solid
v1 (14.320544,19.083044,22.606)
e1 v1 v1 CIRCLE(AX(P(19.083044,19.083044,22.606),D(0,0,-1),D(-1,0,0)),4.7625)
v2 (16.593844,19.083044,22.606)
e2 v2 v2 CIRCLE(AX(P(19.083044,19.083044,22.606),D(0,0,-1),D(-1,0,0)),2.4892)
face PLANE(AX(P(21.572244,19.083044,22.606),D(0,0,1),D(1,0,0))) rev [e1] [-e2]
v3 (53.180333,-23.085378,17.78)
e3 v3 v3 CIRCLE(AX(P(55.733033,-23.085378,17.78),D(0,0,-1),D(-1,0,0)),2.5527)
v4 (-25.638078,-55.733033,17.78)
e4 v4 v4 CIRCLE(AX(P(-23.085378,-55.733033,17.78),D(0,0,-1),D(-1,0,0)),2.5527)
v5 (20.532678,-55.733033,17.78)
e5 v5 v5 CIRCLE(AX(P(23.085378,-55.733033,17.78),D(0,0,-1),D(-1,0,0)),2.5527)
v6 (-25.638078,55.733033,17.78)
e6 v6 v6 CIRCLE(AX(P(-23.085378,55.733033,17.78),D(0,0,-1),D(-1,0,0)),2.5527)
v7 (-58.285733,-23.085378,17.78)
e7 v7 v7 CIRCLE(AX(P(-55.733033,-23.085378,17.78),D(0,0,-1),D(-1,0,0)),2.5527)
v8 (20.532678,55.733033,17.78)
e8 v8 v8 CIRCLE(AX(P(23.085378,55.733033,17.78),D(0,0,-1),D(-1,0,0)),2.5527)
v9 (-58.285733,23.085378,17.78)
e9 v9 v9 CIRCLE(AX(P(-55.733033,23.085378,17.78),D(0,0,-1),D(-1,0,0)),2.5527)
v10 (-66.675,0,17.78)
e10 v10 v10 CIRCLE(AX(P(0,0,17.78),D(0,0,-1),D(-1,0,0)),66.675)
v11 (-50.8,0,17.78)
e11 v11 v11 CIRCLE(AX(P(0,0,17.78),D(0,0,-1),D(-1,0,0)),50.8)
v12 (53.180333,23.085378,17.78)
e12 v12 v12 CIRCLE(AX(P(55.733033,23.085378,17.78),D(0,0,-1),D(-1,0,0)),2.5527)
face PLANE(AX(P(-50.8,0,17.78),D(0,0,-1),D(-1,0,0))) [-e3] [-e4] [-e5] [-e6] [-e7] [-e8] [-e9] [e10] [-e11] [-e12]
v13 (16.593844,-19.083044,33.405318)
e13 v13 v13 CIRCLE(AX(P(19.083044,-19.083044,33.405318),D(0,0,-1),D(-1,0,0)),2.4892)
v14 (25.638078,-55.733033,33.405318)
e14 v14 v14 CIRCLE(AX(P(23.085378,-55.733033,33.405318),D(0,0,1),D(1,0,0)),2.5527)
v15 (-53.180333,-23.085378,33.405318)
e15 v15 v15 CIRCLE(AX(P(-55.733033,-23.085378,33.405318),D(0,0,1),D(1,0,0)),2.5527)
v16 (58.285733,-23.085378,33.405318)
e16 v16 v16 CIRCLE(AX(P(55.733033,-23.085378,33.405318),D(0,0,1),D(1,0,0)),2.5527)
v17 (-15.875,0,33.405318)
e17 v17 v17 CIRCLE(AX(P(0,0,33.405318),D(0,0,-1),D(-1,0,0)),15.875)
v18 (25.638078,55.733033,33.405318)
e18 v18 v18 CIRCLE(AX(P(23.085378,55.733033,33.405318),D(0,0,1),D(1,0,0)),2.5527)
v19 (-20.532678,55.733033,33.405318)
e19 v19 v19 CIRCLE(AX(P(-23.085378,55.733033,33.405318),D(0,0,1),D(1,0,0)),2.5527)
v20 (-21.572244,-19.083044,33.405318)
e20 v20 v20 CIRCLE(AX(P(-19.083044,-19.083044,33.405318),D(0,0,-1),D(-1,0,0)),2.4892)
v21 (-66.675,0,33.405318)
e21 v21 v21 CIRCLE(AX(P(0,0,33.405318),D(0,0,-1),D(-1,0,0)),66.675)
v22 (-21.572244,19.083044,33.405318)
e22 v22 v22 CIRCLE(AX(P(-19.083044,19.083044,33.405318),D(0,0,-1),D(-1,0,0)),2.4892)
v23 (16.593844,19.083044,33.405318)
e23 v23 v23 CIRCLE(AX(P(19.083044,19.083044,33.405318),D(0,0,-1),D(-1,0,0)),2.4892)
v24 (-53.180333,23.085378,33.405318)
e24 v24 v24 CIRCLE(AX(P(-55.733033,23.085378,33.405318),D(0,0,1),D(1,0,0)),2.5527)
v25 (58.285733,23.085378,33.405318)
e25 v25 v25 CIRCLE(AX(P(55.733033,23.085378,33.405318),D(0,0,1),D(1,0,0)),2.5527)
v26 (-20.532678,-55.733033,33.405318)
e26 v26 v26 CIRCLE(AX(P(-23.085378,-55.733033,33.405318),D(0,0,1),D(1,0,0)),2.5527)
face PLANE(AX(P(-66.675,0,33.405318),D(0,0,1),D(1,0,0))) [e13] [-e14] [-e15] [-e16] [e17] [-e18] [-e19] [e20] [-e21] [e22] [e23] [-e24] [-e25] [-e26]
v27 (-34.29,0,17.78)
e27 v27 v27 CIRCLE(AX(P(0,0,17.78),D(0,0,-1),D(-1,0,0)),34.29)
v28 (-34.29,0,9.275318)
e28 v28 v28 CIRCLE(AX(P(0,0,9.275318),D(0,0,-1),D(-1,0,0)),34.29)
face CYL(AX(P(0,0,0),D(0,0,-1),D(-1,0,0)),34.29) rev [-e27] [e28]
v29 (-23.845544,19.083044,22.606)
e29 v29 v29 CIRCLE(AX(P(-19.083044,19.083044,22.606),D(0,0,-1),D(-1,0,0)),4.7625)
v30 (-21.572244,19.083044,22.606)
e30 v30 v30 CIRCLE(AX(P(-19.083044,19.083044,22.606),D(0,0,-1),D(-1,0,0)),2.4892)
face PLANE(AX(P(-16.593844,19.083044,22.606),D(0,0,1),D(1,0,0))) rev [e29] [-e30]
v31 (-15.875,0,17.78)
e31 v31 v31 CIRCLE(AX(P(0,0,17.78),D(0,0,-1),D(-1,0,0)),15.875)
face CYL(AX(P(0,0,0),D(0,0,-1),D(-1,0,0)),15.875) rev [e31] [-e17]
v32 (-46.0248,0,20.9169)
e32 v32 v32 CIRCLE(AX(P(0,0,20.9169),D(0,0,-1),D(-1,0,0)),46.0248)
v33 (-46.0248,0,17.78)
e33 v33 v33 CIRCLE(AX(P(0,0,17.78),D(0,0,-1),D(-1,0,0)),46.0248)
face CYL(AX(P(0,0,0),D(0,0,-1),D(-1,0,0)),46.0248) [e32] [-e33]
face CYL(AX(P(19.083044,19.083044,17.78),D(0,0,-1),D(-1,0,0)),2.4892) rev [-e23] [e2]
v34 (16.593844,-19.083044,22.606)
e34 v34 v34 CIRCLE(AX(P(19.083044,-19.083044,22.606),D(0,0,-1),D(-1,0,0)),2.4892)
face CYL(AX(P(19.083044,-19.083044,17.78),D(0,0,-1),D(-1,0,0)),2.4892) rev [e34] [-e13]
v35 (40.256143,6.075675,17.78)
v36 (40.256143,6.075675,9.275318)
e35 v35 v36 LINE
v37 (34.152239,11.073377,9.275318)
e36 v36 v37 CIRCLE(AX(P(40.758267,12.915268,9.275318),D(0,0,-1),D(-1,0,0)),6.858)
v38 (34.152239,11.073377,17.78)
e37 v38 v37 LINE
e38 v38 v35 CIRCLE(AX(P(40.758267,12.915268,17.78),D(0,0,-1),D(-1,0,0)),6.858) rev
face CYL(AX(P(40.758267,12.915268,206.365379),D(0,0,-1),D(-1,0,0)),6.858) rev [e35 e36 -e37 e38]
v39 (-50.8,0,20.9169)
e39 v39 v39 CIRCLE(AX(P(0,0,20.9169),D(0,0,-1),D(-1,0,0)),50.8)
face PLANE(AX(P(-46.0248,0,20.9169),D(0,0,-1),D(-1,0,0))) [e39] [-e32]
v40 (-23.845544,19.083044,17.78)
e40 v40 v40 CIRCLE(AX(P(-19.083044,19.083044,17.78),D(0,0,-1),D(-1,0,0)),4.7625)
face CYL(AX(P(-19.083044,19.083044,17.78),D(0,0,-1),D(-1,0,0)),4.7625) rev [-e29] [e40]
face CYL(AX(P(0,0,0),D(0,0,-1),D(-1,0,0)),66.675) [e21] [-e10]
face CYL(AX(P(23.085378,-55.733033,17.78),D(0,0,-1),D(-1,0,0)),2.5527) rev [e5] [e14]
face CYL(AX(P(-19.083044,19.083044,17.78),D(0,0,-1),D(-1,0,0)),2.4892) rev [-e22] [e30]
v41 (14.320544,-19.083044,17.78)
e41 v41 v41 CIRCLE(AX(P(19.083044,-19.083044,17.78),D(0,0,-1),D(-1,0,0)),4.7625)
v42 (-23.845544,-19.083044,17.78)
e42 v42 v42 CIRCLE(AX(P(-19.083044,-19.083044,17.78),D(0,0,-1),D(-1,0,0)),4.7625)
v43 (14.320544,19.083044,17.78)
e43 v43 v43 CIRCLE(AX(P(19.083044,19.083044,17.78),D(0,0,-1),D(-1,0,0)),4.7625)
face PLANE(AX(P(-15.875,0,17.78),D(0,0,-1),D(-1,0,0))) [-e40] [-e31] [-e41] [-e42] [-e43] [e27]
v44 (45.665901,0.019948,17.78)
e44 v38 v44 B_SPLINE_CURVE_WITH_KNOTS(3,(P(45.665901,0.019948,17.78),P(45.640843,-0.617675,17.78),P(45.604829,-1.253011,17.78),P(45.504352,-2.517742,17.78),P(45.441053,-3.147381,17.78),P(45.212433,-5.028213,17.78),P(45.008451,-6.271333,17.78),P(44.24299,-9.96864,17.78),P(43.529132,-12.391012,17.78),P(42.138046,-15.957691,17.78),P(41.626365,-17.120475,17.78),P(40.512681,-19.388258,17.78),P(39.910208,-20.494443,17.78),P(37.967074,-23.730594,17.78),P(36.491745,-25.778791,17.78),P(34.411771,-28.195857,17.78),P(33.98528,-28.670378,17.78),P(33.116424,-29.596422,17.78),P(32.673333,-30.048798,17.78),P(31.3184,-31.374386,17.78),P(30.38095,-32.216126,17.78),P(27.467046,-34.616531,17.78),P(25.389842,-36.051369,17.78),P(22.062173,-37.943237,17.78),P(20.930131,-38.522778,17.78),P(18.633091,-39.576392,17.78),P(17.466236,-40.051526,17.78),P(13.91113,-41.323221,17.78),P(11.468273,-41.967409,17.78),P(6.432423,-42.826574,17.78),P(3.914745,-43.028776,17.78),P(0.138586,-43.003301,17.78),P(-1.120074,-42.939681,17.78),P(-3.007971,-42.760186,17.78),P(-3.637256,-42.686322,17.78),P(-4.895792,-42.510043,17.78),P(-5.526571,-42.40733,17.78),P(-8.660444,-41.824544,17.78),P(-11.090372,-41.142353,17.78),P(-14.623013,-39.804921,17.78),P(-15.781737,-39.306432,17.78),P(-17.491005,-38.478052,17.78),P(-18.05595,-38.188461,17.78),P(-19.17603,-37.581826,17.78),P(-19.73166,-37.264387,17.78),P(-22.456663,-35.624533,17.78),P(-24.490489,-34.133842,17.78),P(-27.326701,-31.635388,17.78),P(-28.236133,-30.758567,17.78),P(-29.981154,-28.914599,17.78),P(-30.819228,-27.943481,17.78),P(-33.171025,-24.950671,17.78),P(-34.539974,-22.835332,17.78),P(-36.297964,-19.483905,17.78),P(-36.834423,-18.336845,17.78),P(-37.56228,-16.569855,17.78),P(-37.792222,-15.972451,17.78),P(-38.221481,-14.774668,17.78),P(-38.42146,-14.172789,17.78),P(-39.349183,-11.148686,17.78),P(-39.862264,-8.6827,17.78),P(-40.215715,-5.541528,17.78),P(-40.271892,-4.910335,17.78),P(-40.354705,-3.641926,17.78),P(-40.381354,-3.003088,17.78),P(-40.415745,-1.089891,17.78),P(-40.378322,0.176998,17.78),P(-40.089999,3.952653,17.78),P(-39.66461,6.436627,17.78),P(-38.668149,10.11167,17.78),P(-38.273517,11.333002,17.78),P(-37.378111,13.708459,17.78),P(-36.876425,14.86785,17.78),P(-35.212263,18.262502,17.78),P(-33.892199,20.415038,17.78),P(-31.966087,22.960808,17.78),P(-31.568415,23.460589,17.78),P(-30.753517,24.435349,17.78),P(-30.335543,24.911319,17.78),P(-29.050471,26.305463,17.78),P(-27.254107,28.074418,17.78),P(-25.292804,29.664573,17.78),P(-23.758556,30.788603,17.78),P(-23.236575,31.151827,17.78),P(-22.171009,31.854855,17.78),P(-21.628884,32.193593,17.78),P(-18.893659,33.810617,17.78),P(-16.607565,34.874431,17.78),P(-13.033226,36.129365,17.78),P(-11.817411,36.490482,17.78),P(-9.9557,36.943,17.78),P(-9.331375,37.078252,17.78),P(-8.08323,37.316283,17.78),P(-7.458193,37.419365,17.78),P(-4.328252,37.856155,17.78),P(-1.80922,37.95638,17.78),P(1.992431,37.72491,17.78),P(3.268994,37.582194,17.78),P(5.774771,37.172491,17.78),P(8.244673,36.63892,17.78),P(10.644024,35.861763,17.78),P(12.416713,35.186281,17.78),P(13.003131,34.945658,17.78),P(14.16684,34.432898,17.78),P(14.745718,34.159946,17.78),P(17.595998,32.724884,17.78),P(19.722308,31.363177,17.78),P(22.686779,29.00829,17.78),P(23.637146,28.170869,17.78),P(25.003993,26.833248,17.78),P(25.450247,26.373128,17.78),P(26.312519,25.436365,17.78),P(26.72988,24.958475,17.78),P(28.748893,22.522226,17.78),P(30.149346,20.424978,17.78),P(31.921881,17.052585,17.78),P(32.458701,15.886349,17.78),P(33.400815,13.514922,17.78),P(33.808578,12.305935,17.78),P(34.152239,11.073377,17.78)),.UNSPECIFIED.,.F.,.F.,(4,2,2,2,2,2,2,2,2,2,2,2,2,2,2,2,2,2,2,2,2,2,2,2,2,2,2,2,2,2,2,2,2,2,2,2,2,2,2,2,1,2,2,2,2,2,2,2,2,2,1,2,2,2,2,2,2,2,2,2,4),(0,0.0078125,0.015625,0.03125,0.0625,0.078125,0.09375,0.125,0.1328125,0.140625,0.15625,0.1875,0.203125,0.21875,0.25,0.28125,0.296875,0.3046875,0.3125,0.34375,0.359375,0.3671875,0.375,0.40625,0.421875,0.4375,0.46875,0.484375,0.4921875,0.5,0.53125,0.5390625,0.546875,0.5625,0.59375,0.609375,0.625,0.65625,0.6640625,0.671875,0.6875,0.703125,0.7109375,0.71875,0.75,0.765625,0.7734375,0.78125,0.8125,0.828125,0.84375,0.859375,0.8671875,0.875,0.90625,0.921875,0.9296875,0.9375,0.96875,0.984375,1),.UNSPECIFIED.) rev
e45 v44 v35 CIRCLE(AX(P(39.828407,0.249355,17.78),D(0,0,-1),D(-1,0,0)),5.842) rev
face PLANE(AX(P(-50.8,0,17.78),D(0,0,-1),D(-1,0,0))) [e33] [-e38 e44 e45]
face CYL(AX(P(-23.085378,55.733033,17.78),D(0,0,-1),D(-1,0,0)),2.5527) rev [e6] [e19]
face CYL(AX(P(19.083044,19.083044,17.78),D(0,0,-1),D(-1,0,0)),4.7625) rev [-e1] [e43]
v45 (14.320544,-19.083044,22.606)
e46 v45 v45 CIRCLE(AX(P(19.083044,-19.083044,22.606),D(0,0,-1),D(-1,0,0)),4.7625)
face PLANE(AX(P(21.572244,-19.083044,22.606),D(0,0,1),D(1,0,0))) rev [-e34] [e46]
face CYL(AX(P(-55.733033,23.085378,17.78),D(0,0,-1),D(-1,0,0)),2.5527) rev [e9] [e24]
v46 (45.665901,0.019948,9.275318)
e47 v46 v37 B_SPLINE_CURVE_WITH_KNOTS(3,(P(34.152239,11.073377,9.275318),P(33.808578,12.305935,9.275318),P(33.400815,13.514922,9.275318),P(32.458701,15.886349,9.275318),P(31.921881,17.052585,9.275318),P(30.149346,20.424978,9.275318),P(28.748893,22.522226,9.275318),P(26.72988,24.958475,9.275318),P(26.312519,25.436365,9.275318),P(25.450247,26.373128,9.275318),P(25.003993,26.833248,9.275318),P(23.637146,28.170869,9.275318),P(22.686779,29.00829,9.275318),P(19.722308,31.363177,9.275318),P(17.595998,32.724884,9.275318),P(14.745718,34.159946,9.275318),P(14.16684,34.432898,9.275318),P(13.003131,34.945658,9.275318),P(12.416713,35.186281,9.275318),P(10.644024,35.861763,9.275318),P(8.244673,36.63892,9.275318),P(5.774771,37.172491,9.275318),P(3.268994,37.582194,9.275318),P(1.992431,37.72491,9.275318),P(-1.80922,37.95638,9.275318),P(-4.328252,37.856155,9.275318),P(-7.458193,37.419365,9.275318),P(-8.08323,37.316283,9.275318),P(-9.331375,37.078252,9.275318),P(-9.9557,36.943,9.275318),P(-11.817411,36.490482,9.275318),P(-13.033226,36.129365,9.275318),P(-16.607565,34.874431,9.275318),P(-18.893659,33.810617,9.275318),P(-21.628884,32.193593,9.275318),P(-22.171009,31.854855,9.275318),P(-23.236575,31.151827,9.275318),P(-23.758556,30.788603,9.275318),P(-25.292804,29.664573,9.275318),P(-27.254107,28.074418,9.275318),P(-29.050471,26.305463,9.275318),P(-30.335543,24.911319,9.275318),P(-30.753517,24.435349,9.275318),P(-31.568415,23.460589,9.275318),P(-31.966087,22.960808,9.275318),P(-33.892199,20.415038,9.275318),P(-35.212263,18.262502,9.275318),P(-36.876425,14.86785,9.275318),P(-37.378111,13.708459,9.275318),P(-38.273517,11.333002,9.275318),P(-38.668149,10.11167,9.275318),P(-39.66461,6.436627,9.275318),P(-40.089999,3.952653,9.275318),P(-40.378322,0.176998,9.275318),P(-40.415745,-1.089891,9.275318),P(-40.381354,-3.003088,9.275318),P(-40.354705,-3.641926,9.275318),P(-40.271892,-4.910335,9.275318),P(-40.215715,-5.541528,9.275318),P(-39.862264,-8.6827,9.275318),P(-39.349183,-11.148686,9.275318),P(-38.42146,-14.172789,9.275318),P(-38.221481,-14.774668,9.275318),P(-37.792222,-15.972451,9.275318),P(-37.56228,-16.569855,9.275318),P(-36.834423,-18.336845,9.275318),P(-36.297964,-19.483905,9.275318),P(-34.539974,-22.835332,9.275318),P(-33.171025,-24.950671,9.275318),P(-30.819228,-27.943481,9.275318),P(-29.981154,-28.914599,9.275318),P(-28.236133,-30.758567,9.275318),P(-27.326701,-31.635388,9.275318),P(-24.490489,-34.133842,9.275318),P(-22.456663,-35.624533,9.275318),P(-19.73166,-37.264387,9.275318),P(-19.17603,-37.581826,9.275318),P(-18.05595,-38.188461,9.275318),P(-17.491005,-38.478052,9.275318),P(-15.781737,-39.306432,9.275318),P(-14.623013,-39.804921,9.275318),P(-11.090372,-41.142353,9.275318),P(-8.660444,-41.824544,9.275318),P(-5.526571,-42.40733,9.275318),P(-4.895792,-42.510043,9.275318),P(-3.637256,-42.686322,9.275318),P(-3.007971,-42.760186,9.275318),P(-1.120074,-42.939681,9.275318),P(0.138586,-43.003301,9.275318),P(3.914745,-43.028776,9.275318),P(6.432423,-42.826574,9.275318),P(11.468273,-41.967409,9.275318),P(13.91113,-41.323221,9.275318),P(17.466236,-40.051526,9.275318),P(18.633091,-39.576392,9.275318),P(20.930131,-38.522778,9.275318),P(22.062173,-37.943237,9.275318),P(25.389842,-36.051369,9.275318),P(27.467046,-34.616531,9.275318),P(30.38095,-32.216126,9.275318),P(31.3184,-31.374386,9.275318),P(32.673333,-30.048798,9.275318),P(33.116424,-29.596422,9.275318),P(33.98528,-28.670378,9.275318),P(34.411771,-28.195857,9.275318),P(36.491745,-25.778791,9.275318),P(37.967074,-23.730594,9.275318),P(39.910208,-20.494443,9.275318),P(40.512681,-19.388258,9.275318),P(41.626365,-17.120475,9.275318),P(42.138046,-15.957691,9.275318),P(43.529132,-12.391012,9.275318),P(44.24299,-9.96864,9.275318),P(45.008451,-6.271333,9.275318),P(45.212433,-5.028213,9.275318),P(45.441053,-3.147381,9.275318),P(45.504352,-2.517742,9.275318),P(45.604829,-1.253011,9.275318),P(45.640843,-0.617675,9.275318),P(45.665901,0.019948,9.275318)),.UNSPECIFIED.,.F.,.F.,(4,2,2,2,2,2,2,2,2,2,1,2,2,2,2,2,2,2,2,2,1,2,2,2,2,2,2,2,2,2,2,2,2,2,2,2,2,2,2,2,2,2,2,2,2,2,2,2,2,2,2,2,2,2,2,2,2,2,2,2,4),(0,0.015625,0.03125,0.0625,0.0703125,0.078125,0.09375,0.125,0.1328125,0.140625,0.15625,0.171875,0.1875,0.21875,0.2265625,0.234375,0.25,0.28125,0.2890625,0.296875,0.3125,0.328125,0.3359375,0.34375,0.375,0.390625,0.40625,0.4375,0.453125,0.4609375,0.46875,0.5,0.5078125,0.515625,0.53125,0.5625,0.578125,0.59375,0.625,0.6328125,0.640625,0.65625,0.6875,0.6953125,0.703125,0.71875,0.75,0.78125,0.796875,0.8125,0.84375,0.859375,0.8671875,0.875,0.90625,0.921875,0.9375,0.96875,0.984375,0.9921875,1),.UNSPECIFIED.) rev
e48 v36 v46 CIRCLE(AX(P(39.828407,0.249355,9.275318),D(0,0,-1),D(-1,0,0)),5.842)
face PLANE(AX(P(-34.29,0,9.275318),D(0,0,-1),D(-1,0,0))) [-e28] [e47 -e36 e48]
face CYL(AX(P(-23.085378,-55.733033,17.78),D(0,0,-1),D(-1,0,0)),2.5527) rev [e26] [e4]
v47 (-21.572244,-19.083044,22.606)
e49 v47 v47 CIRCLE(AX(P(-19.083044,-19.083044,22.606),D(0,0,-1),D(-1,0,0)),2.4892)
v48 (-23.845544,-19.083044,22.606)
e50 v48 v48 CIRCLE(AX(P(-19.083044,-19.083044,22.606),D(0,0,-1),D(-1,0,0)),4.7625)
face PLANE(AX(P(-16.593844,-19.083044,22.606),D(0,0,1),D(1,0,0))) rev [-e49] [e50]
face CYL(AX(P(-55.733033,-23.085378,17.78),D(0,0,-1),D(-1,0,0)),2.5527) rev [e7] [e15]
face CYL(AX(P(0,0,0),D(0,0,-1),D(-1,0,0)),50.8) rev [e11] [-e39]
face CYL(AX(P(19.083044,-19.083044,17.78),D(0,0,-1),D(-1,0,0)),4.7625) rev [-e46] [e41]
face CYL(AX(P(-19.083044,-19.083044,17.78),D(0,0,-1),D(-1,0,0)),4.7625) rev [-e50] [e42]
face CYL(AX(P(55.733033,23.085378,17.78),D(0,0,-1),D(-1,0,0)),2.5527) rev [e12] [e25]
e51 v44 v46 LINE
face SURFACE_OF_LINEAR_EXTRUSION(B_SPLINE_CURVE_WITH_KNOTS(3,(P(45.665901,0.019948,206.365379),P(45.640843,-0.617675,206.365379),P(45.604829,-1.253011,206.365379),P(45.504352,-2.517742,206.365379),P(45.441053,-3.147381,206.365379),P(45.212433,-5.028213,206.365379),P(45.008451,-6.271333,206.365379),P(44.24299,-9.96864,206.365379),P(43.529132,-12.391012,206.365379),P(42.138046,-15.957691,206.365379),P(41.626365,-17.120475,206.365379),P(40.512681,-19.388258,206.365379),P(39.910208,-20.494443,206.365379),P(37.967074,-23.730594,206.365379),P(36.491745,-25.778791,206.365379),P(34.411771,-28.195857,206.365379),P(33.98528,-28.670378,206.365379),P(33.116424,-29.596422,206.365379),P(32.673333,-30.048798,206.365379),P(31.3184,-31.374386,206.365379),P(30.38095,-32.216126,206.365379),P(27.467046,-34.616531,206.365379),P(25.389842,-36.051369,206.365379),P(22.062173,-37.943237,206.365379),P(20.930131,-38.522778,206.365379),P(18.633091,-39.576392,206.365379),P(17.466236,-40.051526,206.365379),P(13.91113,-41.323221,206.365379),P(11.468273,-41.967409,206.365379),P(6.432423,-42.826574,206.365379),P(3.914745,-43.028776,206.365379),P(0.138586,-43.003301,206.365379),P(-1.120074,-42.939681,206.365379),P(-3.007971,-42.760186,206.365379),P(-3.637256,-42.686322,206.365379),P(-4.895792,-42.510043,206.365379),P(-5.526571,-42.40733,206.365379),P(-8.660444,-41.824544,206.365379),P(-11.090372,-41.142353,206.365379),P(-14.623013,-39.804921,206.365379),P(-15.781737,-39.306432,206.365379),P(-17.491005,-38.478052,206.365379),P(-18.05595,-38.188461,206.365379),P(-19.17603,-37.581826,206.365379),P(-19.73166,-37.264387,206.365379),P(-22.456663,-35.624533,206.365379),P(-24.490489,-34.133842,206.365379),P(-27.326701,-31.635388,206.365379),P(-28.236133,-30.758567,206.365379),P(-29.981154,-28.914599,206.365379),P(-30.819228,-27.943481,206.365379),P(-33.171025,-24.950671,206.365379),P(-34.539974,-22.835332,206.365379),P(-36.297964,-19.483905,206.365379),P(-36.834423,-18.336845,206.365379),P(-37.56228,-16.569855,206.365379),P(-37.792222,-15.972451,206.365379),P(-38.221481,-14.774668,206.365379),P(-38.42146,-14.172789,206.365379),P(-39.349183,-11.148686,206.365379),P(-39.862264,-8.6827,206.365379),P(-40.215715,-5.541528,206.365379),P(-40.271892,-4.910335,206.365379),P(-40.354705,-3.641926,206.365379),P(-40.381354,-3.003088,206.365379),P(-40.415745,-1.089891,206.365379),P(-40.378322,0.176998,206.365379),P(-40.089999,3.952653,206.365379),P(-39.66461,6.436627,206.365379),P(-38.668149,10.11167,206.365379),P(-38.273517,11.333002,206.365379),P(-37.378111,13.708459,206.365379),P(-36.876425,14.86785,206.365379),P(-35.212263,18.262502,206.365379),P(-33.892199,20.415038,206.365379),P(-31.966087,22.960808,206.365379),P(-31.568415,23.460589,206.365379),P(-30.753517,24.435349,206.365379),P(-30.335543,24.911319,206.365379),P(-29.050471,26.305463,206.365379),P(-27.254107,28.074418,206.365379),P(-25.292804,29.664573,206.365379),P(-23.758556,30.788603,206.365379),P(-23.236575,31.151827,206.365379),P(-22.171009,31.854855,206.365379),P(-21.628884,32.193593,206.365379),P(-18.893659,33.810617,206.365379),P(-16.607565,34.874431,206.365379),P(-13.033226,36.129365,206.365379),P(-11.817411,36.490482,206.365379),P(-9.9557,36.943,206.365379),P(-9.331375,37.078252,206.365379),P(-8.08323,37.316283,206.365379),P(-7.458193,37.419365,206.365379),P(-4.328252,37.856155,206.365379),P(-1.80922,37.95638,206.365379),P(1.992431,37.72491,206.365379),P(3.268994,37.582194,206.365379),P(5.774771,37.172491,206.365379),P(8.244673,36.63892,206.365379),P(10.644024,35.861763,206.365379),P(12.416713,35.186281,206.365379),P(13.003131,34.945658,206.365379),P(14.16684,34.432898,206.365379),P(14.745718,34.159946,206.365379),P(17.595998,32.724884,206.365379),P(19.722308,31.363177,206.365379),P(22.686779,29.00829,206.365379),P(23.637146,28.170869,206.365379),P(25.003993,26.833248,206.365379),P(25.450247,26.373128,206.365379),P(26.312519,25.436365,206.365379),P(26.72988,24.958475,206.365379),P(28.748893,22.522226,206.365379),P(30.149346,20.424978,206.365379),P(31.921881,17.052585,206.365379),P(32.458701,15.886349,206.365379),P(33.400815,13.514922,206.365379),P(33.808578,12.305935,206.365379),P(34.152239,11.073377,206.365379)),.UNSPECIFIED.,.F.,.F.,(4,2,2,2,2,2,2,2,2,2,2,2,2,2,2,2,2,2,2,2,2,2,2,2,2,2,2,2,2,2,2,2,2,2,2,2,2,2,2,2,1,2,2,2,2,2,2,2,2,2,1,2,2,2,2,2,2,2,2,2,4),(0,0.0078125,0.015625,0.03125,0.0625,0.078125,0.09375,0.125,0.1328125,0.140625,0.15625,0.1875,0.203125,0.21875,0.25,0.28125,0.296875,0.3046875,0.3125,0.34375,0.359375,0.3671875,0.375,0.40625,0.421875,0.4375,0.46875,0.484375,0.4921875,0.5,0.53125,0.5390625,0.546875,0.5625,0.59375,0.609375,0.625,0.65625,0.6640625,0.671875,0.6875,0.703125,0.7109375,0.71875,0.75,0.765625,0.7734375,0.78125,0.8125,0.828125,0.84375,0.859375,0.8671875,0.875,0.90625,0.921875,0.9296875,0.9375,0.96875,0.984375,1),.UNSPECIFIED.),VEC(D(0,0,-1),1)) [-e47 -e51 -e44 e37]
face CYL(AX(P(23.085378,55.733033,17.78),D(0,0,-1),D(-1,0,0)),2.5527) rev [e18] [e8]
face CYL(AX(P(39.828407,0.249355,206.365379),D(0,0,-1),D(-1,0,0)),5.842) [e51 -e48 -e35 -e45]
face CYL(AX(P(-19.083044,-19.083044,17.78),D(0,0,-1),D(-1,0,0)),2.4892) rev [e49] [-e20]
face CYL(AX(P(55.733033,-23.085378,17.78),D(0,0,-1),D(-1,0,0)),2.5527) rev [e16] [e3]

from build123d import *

# Parameters (mm, degrees)
CUT_EXTRUDE2_START                              = 9.275318
CUT_EXTRUDE2_OUTLINE_R                          = 47.625
CUT_EXTRUDE2_DEPTH                              = 8.504682
CBORE_FOR_10_SOCKET_HEAD_CAP_SCREW1_D           = 4.9784
CBORE_FOR_10_SOCKET_HEAD_CAP_SCREW1_CBORE_D     = 9.525
CBORE_FOR_10_SOCKET_HEAD_CAP_SCREW1_CBORE_DEPTH = 4.826
F_10_CLEARANCE_HOLE1_D                          = 5.1054
CIRPATTERN1_COUNT                               = 8
CLEARANCING_START                               = -8.504682
SKETCH25_R                                      = 66.675
CLEARANCING_DEPTH                               = 8.504682


# Read off the part's stored shape, not the designer's step: Cut-Extrude2
with BuildPart() as part:
    # Sketch24 → Revolve1 (revolve)
    with BuildSketch(Plane(origin=(0, 0, 0), x_dir=(1, 0, 0), z_dir=(0, 1, 0))):
        Polygon((-15.875, -33.405318), (-15.875, -17.78), (-34.29, -17.78), (-34.29, -9.275318), (-47.625, -9.275318), (-47.625, -17.78), (-46.0248, -17.78), (-46.0248, -20.9169), (-50.8, -20.9169), (-50.8, -17.78), (-66.675, -17.78), (-66.675, -33.405318), align=None)
    revolve(axis=Axis((0, 0, 0), (0, 0, 1)))

    # Cut-Extrude2 outline → Cut-Extrude2 (cut)
    with BuildSketch(Plane.XY.offset(CUT_EXTRUDE2_START)):
        Circle(CUT_EXTRUDE2_OUTLINE_R)
        with BuildLine():
            add(Edge.make_bspline(
                [(34.641574854, 11.209813305), (34.492866613, 11.743162162), (34.153943811, 12.859819093), (33.555538624, 14.537761538), (32.849887572, 16.240636382), (32.057893687, 17.909346365), (31.181197352, 19.53951152), (30.221662701, 21.126830276), (29.181373626, 22.667090912), (28.062629225, 24.156182809), (26.867938753, 25.590107465), (25.60001603, 26.964989265), (24.261773335, 28.277085961), (22.856314773, 29.522798851), (21.386929147, 30.698682629), (19.85708232, 31.801454876), (18.270409111, 32.828005175), (16.630704717, 33.775403815), (14.941915703, 34.640910073), (13.208130556, 35.421980041), (11.43356985, 36.116273987), (9.622576022, 36.721663214), (7.779602801, 37.236236415), (5.909204301, 37.658305492), (4.016023818, 37.986410831), (2.104782347, 38.219326014), (0.180266852, 38.356061949), (-1.75268168, 38.395870413), (-3.689180377, 38.338246992), (-5.624316777, 38.182933409), (-7.553161251, 37.929919231), (-9.470779522, 37.579442948), (-11.37224525, 37.131992419), (-13.252652651, 36.588304682), (-15.107129112, 35.949365124), (-16.930847778, 35.216406011), (-18.719040078, 34.390904381), (-20.467008144, 33.474579298), (-22.170137115, 32.469388481), (-23.823907266, 31.377524301), (-25.42390596, 30.201409162), (-26.965839357, 28.943690275), (-28.445543888, 27.607233836), (-29.858997424, 26.195118613), (-31.202330147, 24.710628968), (-32.471835063, 23.157247319), (-33.663978152, 21.538646066), (-34.775408104, 19.858679), (-35.802965645, 18.121372202), (-36.743692396, 16.330914471), (-37.594839261, 14.491647299), (-38.353874308, 12.608054401), (-39.018490139, 10.68475085), (-39.586610697, 8.726471825), (-40.056397525, 6.738061006), (-40.426255434, 4.724458642), (-40.694837576, 2.690689328), (-40.861049894, 0.641849508), (-40.924054953, -1.416905249), (-40.883275123, -3.480373184), (-40.738395114, -5.543319447), (-40.489363842, -7.600489337), (-40.13639564, -9.646621653), (-39.679970776, -11.676462103), (-39.120835312, -13.684776759), (-38.460000265, -15.666365517), (-37.698740094, -17.61607551), (-36.838590511, -19.528814477), (-35.881345602, -21.399564006), (-34.829054288, -23.223392663), (-33.684016107, -24.995468936), (-32.44877635, -26.711073982), (-31.126120537, -28.365614138), (-29.719068263, -29.954633155), (-28.230866416, -31.473824138), (-26.664981791, -32.919041144), (-25.025093105, -34.286310417), (-23.315082441, -35.571841228), (-21.53902614, -36.772036288), (-19.701185153, -37.883501708), (-17.805994889, -38.903056478), (-15.85805457, -39.827741435), (-13.862116128, -40.654827709), (-11.823072667, -41.381824596), (-9.745946518, -42.006486871), (-7.635876912, -42.526821485), (-5.498107312, -42.941093656), (-3.337972426, -43.247832311), (-1.160884928, -43.445834888), (1.027678058, -43.534171454), (3.222188708, -43.512188152), (5.417082419, -43.379509955), (7.606771886, -43.136042707), (9.785661288, -42.781974466), (11.948160555, -42.317776118), (14.08869967, -41.74420128), (16.201742982, -41.062285471), (18.281803484, -40.273344558), (20.323457017, -39.378972487), (22.321356376, -38.381038284), (24.27024527, -37.281682345), (26.164972102, -36.083312015), (28.000503535, -34.788596469), (29.77193781, -33.400460899), (31.474517775, -31.92208003), (33.103643596, -30.356870964), (34.654885111, -28.708485383), (36.123993806, -26.980801118), (37.506914359, -25.17791311), (38.799795742, -23.304123775), (39.999001844, -21.363932809), (41.101121576, -19.362026441), (42.102978449, -17.303266175), (43.001639577, -15.192677038), (43.794424103, -13.035435358), (44.478911001, -10.836856121), (45.052946246, -8.602379918), (45.514649334, -6.337559517), (45.847889349, -4.143701635), (46.017592475, -2.510533136), (46.090246085, -1.546597167), (46.115686798, -1.160407225), (46.132959236, -0.870548295), (46.148375241, -0.580516781), (46.162099639, -0.290330355), (46.169705769, -0.096784384), (46.173509282, 0)],
                knots=[0.044023807, 0.044023807, 0.044023807, 0.044023807, 0.050477114, 0.057621232, 0.06478017, 0.071953969, 0.079142669, 0.086346306, 0.093564916, 0.100798534, 0.108047194, 0.115310927, 0.122589766, 0.12988374, 0.13719288, 0.144517215, 0.151856774, 0.159211583, 0.16658167, 0.173967063, 0.181367786, 0.188783866, 0.196215328, 0.203662198, 0.211124498, 0.218602253, 0.226095488, 0.233604225, 0.241128486, 0.248668296, 0.256223676, 0.263794648, 0.271381234, 0.278983456, 0.286601335, 0.294234891, 0.301884146, 0.309549121, 0.317229835, 0.324926308, 0.332638561, 0.340366614, 0.348110485, 0.355870195, 0.363645762, 0.371437205, 0.379244543, 0.387067795, 0.39490698, 0.402762115, 0.410633219, 0.41852031, 0.426423405, 0.434342523, 0.442277682, 0.450228898, 0.458196189, 0.466179572, 0.474179065, 0.482194684, 0.490226447, 0.498274369, 0.506338468, 0.514418761, 0.522515263, 0.530627991, 0.538756962, 0.546902191, 0.555063694, 0.563241488, 0.571435588, 0.57964601, 0.58787277, 0.596115883, 0.604375364, 0.61265123, 0.620943495, 0.629252175, 0.637577285, 0.64591884, 0.654276855, 0.662651345, 0.671042324, 0.679449808, 0.687873812, 0.696314349, 0.704771435, 0.713245083, 0.721735309, 0.730242127, 0.738765551, 0.747305595, 0.755862273, 0.7644356, 0.77302559, 0.781632256, 0.790255613, 0.798895674, 0.807552454, 0.816225965, 0.824916222, 0.833623239, 0.842347028, 0.851087604, 0.859844979, 0.868619169, 0.877410184, 0.88621804, 0.895042749, 0.903884325, 0.912742781, 0.921618129, 0.930510383, 0.939419557, 0.948345662, 0.957288712, 0.96624872, 0.975225699, 0.984219661, 0.99210332, 0.994358185, 0.995486016, 0.996614114, 0.997742477, 0.998871105, 1, 1, 1, 1], degree=3))
            ThreePointArc((34.641574854, 11.209813305), (36.735471945, 8.002059693), (40.293337039, 6.582311745))
            ThreePointArc((40.293337039, 6.582311745), (44.564000123, 4.479799319), (46.173509282, 0))
        make_face(mode=Mode.SUBTRACT)
    extrude(amount=CUT_EXTRUDE2_DEPTH, mode=Mode.SUBTRACT)

    # CBORE for #10 Socket Head Cap Screw1 (through all)
    with Locations(Plane(origin=(19.083044257, -19.083044257, 17.78), x_dir=(-1, 0, 0), z_dir=(0, 0, -1))):
        with Locations((0, 0), (0, 38.166088514), (38.166088514, 38.166088514), (38.166088514, 0)):
            CounterBoreHole(CBORE_FOR_10_SOCKET_HEAD_CAP_SCREW1_D / 2, CBORE_FOR_10_SOCKET_HEAD_CAP_SCREW1_CBORE_D / 2, CBORE_FOR_10_SOCKET_HEAD_CAP_SCREW1_CBORE_DEPTH)

    # #10 Clearance Hole1 (through all)
    with Locations(Plane(origin=(55.733032799, -23.085378057, 17.78), x_dir=(-1, 0, 0), z_dir=(0, 0, -1))):
        with Locations((0, 0)):
            f_10_clearance_hole1 = Hole(F_10_CLEARANCE_HOLE1_D / 2)

    # CirPattern1: #10 Clearance Hole1 ×8 about axis
    cirpattern1_axis = Axis((0, 0, 0), (0, 0, 1))
    for i in range(1, CIRPATTERN1_COUNT):
        add(f_10_clearance_hole1.rotate(cirpattern1_axis, i * 360 / CIRPATTERN1_COUNT), mode=Mode.SUBTRACT)

    # Sketch25 → Clearancing (cut)
    with BuildSketch(Plane(origin=(0, 0, 9.275318), x_dir=(-1, 0, 0), z_dir=(0, 0, -1)).offset(CLEARANCING_START)):
        Circle(SKETCH25_R)
        with BuildLine():
            ThreePointArc((-40.256142642, 6.075675212), (-44.185152679, 4.14136378), (-45.665901105, 0.019948406))
            add(Edge.make_bspline(
                [(-45.665901105, 0.019948406), (-45.640843252, -0.617675003), (-45.604829255, -1.253010819), (-45.504351835, -2.517742345), (-45.441052831, -3.147381178), (-45.212432947, -5.028212524), (-45.008450664, -6.271332714), (-44.242989524, -9.968640212), (-43.52913227, -12.391011617), (-42.138045746, -15.957691436), (-41.626364682, -17.120474764), (-40.512680652, -19.388257745), (-39.910207789, -20.494442857), (-37.96707369, -23.730593733), (-36.49174462, -25.778791172), (-34.411771475, -28.195856513), (-33.985279842, -28.670377793), (-33.116423575, -29.596422364), (-32.673332521, -30.04879752), (-31.318399621, -31.37438599), (-30.380949523, -32.216125582), (-27.46704593, -34.616530673), (-25.389841573, -36.05136872), (-22.062172671, -37.943237182), (-20.930130825, -38.522778109), (-18.633091111, -39.57639236), (-17.46623561, -40.051525518), (-13.91112995, -41.323221397), (-11.468273082, -41.967409438), (-6.43242256, -42.826573909), (-3.914744792, -43.028776038), (-0.138586, -43.003300652), (1.120073594, -42.939681088), (3.007971483, -42.760186242), (3.637255506, -42.686322311), (4.895792474, -42.510042802), (5.526571063, -42.407330429), (8.660443645, -41.824544462), (11.090372365, -41.142352886), (14.623012975, -39.804920602), (15.781736724, -39.306432263), (17.491004632, -38.478051741), (18.055949728, -38.188461399), (19.176029707, -37.581826274), (19.731660414, -37.26438738), (22.456662681, -35.624532778), (24.490489311, -34.13384221), (27.326701243, -31.635387766), (28.236132982, -30.758567046), (29.981154487, -28.914599378), (30.819228008, -27.943481359), (33.171025404, -24.950670888), (34.539973674, -22.835332473), (36.297963516, -19.483904717), (36.83442316, -18.336845345), (37.562280382, -16.569855108), (37.792222154, -15.972450916), (38.221480922, -14.774667607), (38.42145983, -14.172789371), (39.349182921, -11.148685634), (39.862263674, -8.682699789), (40.215714934, -5.541527517), (40.271892159, -4.9103345), (40.354705457, -3.641926337), (40.381354461, -3.003087554), (40.415744918, -1.089891477), (40.378321818, 0.17699807), (40.089998698, 3.952653081), (39.66460968, 6.436627246), (38.66814911, 10.111670481), (38.273517277, 11.333002184), (37.378111134, 13.708459229), (36.876425473, 14.867850039), (35.212263321, 18.262501529), (33.892198877, 20.41503772), (31.966087362, 22.960807794), (31.568415192, 23.460588842), (30.753517199, 24.435348736), (30.335543042, 24.911319081), (29.050471233, 26.305463264), (27.254106693, 28.07441755), (25.292803648, 29.664573356), (23.7585556, 30.788602731), (23.23657543, 31.151827317), (22.171009443, 31.854855296), (21.628884127, 32.193593191), (18.893658644, 33.810617118), (16.607565234, 34.874431278), (13.033225917, 36.129365373), (11.817410682, 36.490482396), (9.955700277, 36.942999941), (9.331375211, 37.078252299), (8.083229873, 37.316282707), (7.458193096, 37.419364645), (4.328251999, 37.856154552), (1.809219852, 37.956379859), (-1.992431203, 37.724910244), (-3.268993537, 37.582194436), (-5.774771117, 37.172490518), (-8.244673009, 36.63892044), (-10.644023937, 35.861762645), (-12.416713296, 35.186281009), (-13.003131207, 34.945657629), (-14.166839857, 34.432897949), (-14.74571793, 34.15994609), (-17.595998473, 32.724883965), (-19.722308373, 31.363177043), (-22.686779283, 29.00829021), (-23.637145616, 28.170868672), (-25.003992637, 26.833248229), (-25.450247046, 26.373128306), (-26.31251867, 25.436365373), (-26.729880148, 24.958475365), (-28.748893153, 22.522226272), (-30.149346389, 20.424978266), (-31.921880839, 17.052584644), (-32.458700819, 15.886348957), (-33.400814883, 13.514922144), (-33.808577866, 12.305934879), (-34.152239482, 11.073376896)],
                knots=[0, 0, 0, 0, 0.0078125, 0.0078125, 0.015625, 0.015625, 0.03125, 0.03125, 0.0625, 0.0625, 0.078125, 0.078125, 0.09375, 0.09375, 0.125, 0.125, 0.1328125, 0.1328125, 0.140625, 0.140625, 0.15625, 0.15625, 0.1875, 0.1875, 0.203125, 0.203125, 0.21875, 0.21875, 0.25, 0.25, 0.28125, 0.28125, 0.296875, 0.296875, 0.3046875, 0.3046875, 0.3125, 0.3125, 0.34375, 0.34375, 0.359375, 0.359375, 0.3671875, 0.3671875, 0.375, 0.375, 0.40625, 0.40625, 0.421875, 0.421875, 0.4375, 0.4375, 0.46875, 0.46875, 0.484375, 0.484375, 0.4921875, 0.4921875, 0.5, 0.5, 0.53125, 0.53125, 0.5390625, 0.5390625, 0.546875, 0.546875, 0.5625, 0.5625, 0.59375, 0.59375, 0.609375, 0.609375, 0.625, 0.625, 0.65625, 0.65625, 0.6640625, 0.6640625, 0.671875, 0.671875, 0.6875, 0.703125, 0.703125, 0.7109375, 0.7109375, 0.71875, 0.71875, 0.75, 0.75, 0.765625, 0.765625, 0.7734375, 0.7734375, 0.78125, 0.78125, 0.8125, 0.8125, 0.828125, 0.828125, 0.84375, 0.859375, 0.859375, 0.8671875, 0.8671875, 0.875, 0.875, 0.90625, 0.90625, 0.921875, 0.921875, 0.9296875, 0.9296875, 0.9375, 0.9375, 0.96875, 0.96875, 0.984375, 0.984375, 1, 1, 1, 1], degree=3))
            ThreePointArc((-34.152239482, 11.073376896), (-36.41364834, 7.609002996), (-40.256142642, 6.075675212))
        make_face(mode=Mode.SUBTRACT)
    extrude(amount=CLEARANCING_DEPTH, mode=Mode.SUBTRACT)


solid = part.part
